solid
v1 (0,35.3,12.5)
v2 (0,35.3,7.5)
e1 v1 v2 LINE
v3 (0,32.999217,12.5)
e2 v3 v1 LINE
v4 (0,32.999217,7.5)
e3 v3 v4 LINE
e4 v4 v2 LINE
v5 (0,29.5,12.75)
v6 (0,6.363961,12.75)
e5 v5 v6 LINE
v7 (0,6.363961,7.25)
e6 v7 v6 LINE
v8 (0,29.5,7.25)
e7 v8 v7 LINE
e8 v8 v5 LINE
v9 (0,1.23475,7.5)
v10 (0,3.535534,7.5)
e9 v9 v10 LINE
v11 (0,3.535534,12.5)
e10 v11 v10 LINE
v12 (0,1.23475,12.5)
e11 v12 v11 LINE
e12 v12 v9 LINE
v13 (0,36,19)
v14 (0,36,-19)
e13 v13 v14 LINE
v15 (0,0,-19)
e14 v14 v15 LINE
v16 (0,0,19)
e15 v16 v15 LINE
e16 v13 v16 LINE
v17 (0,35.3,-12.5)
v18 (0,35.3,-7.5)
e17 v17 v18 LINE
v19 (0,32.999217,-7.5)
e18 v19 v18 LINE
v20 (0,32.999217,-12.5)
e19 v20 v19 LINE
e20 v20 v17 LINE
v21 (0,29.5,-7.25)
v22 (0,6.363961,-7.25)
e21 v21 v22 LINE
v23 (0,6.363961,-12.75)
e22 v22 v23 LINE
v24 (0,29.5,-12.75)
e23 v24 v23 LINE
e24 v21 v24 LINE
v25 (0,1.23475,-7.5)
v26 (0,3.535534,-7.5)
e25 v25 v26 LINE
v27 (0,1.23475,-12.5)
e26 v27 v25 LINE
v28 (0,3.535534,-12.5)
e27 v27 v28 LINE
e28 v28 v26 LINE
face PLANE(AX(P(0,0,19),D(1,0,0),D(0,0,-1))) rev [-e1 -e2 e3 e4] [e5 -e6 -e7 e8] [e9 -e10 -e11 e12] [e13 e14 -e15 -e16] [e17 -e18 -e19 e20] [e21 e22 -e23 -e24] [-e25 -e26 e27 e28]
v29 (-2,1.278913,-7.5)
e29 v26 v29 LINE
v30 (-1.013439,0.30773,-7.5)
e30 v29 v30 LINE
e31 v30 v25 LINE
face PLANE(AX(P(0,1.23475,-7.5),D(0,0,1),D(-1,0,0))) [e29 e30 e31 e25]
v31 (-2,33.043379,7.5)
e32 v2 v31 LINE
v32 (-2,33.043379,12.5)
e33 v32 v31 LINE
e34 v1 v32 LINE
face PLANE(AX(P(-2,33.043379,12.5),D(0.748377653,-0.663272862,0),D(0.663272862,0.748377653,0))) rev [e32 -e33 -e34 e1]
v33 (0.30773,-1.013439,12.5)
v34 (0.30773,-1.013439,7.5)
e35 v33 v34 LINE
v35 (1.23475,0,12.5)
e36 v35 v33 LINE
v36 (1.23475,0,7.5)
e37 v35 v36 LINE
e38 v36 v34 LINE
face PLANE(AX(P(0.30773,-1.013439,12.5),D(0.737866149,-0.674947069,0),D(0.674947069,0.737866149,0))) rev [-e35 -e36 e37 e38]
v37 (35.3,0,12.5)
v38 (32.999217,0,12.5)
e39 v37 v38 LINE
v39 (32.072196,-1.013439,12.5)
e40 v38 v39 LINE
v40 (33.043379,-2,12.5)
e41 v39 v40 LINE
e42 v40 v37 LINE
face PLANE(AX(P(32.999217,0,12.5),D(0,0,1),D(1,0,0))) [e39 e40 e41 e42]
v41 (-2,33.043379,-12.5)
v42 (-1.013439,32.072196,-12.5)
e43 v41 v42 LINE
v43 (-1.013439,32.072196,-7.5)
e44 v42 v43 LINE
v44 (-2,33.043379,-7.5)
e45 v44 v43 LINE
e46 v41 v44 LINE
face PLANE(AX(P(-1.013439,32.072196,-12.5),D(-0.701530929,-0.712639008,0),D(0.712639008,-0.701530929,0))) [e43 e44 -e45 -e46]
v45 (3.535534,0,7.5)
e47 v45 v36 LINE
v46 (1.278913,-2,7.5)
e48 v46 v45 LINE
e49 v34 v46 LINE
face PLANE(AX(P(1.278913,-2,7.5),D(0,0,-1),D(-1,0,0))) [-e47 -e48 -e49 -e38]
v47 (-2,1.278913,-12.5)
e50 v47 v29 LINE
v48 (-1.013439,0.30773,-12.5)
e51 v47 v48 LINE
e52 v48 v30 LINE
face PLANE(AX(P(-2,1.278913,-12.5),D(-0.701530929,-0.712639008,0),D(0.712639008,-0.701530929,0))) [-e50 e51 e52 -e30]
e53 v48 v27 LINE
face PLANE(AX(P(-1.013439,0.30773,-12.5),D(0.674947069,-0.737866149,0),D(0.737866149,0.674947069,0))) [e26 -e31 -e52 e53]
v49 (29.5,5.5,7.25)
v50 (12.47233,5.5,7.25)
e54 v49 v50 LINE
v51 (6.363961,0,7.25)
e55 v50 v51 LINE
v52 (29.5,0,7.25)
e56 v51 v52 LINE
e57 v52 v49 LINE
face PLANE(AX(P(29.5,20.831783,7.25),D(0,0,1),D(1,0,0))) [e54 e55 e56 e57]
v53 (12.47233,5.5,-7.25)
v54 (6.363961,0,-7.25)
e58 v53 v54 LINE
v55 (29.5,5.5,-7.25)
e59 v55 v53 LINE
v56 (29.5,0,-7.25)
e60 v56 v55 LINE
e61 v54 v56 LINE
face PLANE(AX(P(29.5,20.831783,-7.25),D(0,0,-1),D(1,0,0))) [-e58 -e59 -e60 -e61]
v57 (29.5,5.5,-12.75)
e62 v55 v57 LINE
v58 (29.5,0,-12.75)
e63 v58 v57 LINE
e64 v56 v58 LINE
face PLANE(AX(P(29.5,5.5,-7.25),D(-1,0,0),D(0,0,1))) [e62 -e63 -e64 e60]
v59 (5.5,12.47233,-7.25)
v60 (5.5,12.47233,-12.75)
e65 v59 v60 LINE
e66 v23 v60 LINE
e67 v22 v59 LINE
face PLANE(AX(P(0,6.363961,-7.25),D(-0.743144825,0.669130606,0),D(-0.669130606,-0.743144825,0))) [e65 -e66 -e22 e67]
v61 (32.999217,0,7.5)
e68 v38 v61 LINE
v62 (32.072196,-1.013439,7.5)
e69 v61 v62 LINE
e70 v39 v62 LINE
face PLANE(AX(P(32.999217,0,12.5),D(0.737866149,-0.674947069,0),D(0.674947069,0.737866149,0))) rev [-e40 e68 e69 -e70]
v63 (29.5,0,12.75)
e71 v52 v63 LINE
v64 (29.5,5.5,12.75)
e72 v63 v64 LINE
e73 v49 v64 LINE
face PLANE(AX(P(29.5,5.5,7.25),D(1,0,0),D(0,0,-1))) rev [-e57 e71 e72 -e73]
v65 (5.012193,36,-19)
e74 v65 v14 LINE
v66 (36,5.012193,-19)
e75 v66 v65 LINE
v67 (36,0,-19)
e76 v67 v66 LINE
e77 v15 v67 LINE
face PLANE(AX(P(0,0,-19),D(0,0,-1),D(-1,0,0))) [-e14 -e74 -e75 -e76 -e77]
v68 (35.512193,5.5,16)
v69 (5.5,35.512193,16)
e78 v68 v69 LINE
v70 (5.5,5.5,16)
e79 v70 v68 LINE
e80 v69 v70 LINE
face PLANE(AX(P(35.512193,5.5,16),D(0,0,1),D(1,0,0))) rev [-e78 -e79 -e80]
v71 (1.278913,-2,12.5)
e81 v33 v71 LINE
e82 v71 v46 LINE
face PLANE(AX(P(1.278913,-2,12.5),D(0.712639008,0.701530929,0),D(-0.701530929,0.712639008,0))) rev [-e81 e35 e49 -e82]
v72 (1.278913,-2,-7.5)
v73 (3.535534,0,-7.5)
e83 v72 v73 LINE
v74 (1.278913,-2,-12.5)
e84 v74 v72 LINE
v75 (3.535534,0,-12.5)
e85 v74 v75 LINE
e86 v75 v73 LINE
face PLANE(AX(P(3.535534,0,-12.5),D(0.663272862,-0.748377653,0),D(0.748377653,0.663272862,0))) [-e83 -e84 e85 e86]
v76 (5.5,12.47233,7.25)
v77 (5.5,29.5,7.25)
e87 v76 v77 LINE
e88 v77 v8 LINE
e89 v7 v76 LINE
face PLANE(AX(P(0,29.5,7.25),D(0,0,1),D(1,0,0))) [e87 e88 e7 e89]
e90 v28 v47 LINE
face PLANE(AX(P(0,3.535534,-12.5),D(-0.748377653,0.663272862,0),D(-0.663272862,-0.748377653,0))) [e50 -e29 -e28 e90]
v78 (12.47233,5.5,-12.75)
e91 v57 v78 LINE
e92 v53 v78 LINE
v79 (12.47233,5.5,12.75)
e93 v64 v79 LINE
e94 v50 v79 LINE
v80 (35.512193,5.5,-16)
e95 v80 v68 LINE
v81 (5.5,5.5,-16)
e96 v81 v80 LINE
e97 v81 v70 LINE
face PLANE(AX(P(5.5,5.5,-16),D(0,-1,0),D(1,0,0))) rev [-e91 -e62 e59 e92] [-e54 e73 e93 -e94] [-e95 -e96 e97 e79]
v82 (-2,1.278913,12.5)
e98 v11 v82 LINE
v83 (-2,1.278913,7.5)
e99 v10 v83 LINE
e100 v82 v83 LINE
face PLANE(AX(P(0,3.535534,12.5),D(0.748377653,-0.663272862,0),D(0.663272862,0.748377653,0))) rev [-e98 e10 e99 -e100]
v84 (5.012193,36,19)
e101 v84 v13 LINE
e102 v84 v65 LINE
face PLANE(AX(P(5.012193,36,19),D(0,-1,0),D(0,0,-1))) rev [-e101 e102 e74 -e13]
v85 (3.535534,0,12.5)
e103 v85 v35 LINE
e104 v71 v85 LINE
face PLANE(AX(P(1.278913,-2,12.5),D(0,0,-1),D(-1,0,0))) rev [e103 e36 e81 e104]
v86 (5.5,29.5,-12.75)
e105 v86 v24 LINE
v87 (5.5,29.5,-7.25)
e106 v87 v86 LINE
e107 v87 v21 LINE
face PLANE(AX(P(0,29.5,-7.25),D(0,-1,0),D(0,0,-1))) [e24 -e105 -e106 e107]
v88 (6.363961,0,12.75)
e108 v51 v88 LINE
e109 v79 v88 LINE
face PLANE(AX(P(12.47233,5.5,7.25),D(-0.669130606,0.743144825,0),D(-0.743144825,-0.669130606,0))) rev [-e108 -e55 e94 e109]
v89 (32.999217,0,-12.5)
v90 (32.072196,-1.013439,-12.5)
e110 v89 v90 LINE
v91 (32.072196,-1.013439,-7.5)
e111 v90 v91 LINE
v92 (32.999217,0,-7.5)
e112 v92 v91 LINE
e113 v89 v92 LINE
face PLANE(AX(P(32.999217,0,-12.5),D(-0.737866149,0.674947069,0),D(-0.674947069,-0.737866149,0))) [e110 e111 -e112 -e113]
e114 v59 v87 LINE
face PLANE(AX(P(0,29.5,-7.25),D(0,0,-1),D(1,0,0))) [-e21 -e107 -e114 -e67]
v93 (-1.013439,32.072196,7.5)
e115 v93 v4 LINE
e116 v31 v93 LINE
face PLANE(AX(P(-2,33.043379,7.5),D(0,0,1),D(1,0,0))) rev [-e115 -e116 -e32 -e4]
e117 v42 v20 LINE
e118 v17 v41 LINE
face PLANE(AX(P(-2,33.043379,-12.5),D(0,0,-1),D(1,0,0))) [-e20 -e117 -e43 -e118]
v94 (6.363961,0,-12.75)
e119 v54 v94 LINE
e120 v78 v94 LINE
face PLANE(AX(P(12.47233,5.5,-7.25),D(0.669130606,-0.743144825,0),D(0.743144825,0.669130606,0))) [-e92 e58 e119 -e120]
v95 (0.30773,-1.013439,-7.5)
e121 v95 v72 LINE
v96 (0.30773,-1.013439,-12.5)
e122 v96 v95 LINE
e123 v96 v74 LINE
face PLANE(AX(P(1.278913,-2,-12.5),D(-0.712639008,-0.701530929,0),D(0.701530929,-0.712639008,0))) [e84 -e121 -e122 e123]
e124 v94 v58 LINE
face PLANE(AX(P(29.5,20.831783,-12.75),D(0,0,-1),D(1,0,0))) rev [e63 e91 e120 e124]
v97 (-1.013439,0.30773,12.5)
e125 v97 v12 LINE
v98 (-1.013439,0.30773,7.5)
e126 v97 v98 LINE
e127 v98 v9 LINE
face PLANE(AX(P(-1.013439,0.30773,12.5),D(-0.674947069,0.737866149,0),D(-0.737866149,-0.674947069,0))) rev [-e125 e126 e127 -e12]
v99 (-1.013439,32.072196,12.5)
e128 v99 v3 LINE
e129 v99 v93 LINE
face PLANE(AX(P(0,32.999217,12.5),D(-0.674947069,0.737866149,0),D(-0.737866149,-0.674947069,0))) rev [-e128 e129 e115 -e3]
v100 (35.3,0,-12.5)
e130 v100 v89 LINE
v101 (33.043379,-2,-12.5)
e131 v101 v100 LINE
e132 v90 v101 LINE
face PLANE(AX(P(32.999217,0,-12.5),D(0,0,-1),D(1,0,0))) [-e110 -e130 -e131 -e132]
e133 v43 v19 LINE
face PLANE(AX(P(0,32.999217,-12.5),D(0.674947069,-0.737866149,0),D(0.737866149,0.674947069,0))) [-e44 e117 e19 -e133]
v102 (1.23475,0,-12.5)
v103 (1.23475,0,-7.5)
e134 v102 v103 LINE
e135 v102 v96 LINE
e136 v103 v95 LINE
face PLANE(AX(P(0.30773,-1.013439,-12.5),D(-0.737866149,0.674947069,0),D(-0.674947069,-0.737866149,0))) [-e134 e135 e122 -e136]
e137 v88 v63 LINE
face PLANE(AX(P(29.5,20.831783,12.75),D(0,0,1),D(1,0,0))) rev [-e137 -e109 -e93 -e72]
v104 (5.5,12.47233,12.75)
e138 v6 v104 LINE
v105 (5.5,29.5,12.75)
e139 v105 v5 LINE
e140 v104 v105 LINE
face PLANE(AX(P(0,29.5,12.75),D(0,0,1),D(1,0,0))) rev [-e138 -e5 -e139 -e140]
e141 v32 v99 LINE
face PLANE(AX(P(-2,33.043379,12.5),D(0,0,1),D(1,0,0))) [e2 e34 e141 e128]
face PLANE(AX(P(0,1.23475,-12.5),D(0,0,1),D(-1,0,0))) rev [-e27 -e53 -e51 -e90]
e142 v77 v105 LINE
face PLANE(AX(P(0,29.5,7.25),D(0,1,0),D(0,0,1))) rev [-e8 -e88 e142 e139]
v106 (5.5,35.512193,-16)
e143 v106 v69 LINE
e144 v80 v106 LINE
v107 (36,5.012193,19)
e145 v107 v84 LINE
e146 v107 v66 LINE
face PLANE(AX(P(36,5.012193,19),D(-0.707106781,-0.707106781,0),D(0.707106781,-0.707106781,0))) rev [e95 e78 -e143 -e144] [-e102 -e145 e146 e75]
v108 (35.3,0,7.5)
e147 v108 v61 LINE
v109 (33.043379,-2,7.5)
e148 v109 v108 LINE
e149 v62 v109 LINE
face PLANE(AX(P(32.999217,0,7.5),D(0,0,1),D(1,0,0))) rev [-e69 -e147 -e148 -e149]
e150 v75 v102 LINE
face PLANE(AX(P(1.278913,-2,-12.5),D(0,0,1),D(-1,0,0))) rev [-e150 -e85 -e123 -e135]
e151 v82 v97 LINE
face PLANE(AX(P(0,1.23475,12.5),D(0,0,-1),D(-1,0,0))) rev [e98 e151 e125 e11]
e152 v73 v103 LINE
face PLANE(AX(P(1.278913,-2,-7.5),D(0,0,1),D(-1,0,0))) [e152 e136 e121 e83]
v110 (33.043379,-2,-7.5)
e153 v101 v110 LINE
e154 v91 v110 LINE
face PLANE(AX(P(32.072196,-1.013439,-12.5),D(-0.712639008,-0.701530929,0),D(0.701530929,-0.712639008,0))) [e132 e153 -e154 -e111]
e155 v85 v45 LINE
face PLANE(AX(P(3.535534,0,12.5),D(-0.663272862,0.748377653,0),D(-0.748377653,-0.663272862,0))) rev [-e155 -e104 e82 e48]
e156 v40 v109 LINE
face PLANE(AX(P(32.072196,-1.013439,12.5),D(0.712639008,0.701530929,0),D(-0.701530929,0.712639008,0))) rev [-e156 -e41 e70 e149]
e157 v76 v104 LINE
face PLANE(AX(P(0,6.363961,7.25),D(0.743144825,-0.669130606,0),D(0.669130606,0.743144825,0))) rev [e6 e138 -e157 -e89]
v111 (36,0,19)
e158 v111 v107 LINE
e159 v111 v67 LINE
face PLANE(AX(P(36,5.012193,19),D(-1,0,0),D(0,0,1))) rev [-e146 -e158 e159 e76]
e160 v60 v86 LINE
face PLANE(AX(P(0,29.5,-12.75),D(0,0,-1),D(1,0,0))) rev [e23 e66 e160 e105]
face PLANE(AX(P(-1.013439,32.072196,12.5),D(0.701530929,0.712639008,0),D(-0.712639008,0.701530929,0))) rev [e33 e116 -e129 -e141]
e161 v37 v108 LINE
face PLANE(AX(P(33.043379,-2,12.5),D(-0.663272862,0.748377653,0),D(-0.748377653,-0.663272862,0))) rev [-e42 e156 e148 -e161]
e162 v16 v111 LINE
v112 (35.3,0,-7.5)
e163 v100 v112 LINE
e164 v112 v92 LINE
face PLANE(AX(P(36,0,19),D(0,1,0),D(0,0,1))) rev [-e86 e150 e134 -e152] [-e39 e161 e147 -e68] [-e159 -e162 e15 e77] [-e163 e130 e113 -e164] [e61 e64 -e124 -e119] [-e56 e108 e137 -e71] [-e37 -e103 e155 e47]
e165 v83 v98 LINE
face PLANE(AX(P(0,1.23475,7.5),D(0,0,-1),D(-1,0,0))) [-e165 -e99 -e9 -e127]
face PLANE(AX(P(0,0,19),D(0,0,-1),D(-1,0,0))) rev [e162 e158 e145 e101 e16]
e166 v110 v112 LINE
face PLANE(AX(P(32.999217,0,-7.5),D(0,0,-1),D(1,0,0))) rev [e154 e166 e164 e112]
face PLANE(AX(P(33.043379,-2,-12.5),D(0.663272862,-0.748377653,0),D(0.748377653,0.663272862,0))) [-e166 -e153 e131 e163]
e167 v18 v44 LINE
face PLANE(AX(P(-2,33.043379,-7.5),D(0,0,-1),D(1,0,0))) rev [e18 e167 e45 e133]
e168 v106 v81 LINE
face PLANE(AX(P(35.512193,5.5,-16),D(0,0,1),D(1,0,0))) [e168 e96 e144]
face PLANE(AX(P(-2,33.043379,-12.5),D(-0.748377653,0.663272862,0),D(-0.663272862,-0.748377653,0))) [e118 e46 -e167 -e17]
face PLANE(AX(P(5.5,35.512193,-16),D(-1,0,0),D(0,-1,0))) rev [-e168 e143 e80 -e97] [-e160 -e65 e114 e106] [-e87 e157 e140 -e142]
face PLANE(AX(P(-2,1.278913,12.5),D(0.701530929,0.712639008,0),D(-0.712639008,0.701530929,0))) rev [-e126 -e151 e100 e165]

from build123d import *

# Parameters (mm, degrees)
BOSS_EXTRUDE1_DEPTH = 19
CUT_EXTRUDE1_START  = -16
CUT_EXTRUDE1_DEPTH  = 32
MIRROR1_START       = -12.75
MIRROR1_DEPTH       = 5.5
MIRROR1_START_2     = 7.25
MIRROR1_2_DEPTH     = 5.5
MIRROR1_START_3     = -12.5
MIRROR1_3_DEPTH     = 5
MIRROR1_START_4     = 7.5
MIRROR1_4_DEPTH     = 5


# Read off the part's stored shape, not the designer's step: Mirror1
with BuildPart() as part:
    # Sketch1 → Boss-Extrude1 (new, symmetric)
    with BuildSketch(Plane.XY):
        Polygon((0, 0), (0, 36), (5.012193309, 36), (36, 5.012193309), (36, 0), align=None)
    extrude(amount=BOSS_EXTRUDE1_DEPTH, both=True)

    # Sketch2 → Cut-Extrude1 (cut)
    with BuildSketch(Plane.XY.offset(CUT_EXTRUDE1_START)):
        Polygon((5.5, 35.512193309), (5.5, 5.5), (35.512193309, 5.5), align=None)
    extrude(amount=CUT_EXTRUDE1_DEPTH, mode=Mode.SUBTRACT)

    # Mirror1 outline → Mirror1 (cut)
    with BuildSketch(Plane.XY.offset(MIRROR1_START)):
        Polygon((5.5, 12.472329862), (5.5, 29.5), (0, 29.5), (0, 6.363961031), align=None)
        Polygon((29.5, 5.5), (12.472329862, 5.5), (6.363961031, 0), (29.5, 0), align=None)
    extrude(amount=MIRROR1_DEPTH, mode=Mode.SUBTRACT)

    # Mirror1 2 outline → Mirror1 2 (cut)
    with BuildSketch(Plane.XY.offset(MIRROR1_START_2)):
        Polygon((5.5, 12.472329862), (5.5, 29.5), (0, 29.5), (0, 6.363961031), align=None)
        Polygon((29.5, 5.5), (12.472329862, 5.5), (6.363961031, 0), (29.5, 0), align=None)
    extrude(amount=MIRROR1_2_DEPTH, mode=Mode.SUBTRACT)

    # Mirror1 3 outline → Mirror1 3 (add)
    with BuildSketch(Plane.XY.offset(MIRROR1_START_3)):
        Polygon((35.3, 0), (32.999216572, 0), (32.072195597, -1.013438577), (33.043379246, -2), align=None)
        Polygon((-1.013438577, 32.072195597), (0, 32.999216572), (0, 35.3), (-2, 33.043379246), align=None)
        Polygon((0, 1.234750477), (0, 3.535533906), (-2, 1.278913151), (-1.013438577, 0.307729503), align=None)
        Polygon((1.278913151, -2), (3.535533906, 0), (1.234750477, 0), (0.307729503, -1.013438577), align=None)
    extrude(amount=MIRROR1_3_DEPTH)

    # Mirror1 4 outline → Mirror1 4 (add)
    with BuildSketch(Plane.XY.offset(MIRROR1_START_4)):
        Polygon((35.3, 0), (32.999216572, 0), (32.072195597, -1.013438577), (33.043379246, -2), align=None)
        Polygon((-1.013438577, 32.072195597), (0, 32.999216572), (0, 35.3), (-2, 33.043379246), align=None)
        Polygon((0, 1.234750477), (0, 3.535533906), (-2, 1.278913151), (-1.013438577, 0.307729503), align=None)
        Polygon((1.278913151, -2), (3.535533906, 0), (1.234750477, 0), (0.307729503, -1.013438577), align=None)
    extrude(amount=MIRROR1_4_DEPTH)


solid = part.part
